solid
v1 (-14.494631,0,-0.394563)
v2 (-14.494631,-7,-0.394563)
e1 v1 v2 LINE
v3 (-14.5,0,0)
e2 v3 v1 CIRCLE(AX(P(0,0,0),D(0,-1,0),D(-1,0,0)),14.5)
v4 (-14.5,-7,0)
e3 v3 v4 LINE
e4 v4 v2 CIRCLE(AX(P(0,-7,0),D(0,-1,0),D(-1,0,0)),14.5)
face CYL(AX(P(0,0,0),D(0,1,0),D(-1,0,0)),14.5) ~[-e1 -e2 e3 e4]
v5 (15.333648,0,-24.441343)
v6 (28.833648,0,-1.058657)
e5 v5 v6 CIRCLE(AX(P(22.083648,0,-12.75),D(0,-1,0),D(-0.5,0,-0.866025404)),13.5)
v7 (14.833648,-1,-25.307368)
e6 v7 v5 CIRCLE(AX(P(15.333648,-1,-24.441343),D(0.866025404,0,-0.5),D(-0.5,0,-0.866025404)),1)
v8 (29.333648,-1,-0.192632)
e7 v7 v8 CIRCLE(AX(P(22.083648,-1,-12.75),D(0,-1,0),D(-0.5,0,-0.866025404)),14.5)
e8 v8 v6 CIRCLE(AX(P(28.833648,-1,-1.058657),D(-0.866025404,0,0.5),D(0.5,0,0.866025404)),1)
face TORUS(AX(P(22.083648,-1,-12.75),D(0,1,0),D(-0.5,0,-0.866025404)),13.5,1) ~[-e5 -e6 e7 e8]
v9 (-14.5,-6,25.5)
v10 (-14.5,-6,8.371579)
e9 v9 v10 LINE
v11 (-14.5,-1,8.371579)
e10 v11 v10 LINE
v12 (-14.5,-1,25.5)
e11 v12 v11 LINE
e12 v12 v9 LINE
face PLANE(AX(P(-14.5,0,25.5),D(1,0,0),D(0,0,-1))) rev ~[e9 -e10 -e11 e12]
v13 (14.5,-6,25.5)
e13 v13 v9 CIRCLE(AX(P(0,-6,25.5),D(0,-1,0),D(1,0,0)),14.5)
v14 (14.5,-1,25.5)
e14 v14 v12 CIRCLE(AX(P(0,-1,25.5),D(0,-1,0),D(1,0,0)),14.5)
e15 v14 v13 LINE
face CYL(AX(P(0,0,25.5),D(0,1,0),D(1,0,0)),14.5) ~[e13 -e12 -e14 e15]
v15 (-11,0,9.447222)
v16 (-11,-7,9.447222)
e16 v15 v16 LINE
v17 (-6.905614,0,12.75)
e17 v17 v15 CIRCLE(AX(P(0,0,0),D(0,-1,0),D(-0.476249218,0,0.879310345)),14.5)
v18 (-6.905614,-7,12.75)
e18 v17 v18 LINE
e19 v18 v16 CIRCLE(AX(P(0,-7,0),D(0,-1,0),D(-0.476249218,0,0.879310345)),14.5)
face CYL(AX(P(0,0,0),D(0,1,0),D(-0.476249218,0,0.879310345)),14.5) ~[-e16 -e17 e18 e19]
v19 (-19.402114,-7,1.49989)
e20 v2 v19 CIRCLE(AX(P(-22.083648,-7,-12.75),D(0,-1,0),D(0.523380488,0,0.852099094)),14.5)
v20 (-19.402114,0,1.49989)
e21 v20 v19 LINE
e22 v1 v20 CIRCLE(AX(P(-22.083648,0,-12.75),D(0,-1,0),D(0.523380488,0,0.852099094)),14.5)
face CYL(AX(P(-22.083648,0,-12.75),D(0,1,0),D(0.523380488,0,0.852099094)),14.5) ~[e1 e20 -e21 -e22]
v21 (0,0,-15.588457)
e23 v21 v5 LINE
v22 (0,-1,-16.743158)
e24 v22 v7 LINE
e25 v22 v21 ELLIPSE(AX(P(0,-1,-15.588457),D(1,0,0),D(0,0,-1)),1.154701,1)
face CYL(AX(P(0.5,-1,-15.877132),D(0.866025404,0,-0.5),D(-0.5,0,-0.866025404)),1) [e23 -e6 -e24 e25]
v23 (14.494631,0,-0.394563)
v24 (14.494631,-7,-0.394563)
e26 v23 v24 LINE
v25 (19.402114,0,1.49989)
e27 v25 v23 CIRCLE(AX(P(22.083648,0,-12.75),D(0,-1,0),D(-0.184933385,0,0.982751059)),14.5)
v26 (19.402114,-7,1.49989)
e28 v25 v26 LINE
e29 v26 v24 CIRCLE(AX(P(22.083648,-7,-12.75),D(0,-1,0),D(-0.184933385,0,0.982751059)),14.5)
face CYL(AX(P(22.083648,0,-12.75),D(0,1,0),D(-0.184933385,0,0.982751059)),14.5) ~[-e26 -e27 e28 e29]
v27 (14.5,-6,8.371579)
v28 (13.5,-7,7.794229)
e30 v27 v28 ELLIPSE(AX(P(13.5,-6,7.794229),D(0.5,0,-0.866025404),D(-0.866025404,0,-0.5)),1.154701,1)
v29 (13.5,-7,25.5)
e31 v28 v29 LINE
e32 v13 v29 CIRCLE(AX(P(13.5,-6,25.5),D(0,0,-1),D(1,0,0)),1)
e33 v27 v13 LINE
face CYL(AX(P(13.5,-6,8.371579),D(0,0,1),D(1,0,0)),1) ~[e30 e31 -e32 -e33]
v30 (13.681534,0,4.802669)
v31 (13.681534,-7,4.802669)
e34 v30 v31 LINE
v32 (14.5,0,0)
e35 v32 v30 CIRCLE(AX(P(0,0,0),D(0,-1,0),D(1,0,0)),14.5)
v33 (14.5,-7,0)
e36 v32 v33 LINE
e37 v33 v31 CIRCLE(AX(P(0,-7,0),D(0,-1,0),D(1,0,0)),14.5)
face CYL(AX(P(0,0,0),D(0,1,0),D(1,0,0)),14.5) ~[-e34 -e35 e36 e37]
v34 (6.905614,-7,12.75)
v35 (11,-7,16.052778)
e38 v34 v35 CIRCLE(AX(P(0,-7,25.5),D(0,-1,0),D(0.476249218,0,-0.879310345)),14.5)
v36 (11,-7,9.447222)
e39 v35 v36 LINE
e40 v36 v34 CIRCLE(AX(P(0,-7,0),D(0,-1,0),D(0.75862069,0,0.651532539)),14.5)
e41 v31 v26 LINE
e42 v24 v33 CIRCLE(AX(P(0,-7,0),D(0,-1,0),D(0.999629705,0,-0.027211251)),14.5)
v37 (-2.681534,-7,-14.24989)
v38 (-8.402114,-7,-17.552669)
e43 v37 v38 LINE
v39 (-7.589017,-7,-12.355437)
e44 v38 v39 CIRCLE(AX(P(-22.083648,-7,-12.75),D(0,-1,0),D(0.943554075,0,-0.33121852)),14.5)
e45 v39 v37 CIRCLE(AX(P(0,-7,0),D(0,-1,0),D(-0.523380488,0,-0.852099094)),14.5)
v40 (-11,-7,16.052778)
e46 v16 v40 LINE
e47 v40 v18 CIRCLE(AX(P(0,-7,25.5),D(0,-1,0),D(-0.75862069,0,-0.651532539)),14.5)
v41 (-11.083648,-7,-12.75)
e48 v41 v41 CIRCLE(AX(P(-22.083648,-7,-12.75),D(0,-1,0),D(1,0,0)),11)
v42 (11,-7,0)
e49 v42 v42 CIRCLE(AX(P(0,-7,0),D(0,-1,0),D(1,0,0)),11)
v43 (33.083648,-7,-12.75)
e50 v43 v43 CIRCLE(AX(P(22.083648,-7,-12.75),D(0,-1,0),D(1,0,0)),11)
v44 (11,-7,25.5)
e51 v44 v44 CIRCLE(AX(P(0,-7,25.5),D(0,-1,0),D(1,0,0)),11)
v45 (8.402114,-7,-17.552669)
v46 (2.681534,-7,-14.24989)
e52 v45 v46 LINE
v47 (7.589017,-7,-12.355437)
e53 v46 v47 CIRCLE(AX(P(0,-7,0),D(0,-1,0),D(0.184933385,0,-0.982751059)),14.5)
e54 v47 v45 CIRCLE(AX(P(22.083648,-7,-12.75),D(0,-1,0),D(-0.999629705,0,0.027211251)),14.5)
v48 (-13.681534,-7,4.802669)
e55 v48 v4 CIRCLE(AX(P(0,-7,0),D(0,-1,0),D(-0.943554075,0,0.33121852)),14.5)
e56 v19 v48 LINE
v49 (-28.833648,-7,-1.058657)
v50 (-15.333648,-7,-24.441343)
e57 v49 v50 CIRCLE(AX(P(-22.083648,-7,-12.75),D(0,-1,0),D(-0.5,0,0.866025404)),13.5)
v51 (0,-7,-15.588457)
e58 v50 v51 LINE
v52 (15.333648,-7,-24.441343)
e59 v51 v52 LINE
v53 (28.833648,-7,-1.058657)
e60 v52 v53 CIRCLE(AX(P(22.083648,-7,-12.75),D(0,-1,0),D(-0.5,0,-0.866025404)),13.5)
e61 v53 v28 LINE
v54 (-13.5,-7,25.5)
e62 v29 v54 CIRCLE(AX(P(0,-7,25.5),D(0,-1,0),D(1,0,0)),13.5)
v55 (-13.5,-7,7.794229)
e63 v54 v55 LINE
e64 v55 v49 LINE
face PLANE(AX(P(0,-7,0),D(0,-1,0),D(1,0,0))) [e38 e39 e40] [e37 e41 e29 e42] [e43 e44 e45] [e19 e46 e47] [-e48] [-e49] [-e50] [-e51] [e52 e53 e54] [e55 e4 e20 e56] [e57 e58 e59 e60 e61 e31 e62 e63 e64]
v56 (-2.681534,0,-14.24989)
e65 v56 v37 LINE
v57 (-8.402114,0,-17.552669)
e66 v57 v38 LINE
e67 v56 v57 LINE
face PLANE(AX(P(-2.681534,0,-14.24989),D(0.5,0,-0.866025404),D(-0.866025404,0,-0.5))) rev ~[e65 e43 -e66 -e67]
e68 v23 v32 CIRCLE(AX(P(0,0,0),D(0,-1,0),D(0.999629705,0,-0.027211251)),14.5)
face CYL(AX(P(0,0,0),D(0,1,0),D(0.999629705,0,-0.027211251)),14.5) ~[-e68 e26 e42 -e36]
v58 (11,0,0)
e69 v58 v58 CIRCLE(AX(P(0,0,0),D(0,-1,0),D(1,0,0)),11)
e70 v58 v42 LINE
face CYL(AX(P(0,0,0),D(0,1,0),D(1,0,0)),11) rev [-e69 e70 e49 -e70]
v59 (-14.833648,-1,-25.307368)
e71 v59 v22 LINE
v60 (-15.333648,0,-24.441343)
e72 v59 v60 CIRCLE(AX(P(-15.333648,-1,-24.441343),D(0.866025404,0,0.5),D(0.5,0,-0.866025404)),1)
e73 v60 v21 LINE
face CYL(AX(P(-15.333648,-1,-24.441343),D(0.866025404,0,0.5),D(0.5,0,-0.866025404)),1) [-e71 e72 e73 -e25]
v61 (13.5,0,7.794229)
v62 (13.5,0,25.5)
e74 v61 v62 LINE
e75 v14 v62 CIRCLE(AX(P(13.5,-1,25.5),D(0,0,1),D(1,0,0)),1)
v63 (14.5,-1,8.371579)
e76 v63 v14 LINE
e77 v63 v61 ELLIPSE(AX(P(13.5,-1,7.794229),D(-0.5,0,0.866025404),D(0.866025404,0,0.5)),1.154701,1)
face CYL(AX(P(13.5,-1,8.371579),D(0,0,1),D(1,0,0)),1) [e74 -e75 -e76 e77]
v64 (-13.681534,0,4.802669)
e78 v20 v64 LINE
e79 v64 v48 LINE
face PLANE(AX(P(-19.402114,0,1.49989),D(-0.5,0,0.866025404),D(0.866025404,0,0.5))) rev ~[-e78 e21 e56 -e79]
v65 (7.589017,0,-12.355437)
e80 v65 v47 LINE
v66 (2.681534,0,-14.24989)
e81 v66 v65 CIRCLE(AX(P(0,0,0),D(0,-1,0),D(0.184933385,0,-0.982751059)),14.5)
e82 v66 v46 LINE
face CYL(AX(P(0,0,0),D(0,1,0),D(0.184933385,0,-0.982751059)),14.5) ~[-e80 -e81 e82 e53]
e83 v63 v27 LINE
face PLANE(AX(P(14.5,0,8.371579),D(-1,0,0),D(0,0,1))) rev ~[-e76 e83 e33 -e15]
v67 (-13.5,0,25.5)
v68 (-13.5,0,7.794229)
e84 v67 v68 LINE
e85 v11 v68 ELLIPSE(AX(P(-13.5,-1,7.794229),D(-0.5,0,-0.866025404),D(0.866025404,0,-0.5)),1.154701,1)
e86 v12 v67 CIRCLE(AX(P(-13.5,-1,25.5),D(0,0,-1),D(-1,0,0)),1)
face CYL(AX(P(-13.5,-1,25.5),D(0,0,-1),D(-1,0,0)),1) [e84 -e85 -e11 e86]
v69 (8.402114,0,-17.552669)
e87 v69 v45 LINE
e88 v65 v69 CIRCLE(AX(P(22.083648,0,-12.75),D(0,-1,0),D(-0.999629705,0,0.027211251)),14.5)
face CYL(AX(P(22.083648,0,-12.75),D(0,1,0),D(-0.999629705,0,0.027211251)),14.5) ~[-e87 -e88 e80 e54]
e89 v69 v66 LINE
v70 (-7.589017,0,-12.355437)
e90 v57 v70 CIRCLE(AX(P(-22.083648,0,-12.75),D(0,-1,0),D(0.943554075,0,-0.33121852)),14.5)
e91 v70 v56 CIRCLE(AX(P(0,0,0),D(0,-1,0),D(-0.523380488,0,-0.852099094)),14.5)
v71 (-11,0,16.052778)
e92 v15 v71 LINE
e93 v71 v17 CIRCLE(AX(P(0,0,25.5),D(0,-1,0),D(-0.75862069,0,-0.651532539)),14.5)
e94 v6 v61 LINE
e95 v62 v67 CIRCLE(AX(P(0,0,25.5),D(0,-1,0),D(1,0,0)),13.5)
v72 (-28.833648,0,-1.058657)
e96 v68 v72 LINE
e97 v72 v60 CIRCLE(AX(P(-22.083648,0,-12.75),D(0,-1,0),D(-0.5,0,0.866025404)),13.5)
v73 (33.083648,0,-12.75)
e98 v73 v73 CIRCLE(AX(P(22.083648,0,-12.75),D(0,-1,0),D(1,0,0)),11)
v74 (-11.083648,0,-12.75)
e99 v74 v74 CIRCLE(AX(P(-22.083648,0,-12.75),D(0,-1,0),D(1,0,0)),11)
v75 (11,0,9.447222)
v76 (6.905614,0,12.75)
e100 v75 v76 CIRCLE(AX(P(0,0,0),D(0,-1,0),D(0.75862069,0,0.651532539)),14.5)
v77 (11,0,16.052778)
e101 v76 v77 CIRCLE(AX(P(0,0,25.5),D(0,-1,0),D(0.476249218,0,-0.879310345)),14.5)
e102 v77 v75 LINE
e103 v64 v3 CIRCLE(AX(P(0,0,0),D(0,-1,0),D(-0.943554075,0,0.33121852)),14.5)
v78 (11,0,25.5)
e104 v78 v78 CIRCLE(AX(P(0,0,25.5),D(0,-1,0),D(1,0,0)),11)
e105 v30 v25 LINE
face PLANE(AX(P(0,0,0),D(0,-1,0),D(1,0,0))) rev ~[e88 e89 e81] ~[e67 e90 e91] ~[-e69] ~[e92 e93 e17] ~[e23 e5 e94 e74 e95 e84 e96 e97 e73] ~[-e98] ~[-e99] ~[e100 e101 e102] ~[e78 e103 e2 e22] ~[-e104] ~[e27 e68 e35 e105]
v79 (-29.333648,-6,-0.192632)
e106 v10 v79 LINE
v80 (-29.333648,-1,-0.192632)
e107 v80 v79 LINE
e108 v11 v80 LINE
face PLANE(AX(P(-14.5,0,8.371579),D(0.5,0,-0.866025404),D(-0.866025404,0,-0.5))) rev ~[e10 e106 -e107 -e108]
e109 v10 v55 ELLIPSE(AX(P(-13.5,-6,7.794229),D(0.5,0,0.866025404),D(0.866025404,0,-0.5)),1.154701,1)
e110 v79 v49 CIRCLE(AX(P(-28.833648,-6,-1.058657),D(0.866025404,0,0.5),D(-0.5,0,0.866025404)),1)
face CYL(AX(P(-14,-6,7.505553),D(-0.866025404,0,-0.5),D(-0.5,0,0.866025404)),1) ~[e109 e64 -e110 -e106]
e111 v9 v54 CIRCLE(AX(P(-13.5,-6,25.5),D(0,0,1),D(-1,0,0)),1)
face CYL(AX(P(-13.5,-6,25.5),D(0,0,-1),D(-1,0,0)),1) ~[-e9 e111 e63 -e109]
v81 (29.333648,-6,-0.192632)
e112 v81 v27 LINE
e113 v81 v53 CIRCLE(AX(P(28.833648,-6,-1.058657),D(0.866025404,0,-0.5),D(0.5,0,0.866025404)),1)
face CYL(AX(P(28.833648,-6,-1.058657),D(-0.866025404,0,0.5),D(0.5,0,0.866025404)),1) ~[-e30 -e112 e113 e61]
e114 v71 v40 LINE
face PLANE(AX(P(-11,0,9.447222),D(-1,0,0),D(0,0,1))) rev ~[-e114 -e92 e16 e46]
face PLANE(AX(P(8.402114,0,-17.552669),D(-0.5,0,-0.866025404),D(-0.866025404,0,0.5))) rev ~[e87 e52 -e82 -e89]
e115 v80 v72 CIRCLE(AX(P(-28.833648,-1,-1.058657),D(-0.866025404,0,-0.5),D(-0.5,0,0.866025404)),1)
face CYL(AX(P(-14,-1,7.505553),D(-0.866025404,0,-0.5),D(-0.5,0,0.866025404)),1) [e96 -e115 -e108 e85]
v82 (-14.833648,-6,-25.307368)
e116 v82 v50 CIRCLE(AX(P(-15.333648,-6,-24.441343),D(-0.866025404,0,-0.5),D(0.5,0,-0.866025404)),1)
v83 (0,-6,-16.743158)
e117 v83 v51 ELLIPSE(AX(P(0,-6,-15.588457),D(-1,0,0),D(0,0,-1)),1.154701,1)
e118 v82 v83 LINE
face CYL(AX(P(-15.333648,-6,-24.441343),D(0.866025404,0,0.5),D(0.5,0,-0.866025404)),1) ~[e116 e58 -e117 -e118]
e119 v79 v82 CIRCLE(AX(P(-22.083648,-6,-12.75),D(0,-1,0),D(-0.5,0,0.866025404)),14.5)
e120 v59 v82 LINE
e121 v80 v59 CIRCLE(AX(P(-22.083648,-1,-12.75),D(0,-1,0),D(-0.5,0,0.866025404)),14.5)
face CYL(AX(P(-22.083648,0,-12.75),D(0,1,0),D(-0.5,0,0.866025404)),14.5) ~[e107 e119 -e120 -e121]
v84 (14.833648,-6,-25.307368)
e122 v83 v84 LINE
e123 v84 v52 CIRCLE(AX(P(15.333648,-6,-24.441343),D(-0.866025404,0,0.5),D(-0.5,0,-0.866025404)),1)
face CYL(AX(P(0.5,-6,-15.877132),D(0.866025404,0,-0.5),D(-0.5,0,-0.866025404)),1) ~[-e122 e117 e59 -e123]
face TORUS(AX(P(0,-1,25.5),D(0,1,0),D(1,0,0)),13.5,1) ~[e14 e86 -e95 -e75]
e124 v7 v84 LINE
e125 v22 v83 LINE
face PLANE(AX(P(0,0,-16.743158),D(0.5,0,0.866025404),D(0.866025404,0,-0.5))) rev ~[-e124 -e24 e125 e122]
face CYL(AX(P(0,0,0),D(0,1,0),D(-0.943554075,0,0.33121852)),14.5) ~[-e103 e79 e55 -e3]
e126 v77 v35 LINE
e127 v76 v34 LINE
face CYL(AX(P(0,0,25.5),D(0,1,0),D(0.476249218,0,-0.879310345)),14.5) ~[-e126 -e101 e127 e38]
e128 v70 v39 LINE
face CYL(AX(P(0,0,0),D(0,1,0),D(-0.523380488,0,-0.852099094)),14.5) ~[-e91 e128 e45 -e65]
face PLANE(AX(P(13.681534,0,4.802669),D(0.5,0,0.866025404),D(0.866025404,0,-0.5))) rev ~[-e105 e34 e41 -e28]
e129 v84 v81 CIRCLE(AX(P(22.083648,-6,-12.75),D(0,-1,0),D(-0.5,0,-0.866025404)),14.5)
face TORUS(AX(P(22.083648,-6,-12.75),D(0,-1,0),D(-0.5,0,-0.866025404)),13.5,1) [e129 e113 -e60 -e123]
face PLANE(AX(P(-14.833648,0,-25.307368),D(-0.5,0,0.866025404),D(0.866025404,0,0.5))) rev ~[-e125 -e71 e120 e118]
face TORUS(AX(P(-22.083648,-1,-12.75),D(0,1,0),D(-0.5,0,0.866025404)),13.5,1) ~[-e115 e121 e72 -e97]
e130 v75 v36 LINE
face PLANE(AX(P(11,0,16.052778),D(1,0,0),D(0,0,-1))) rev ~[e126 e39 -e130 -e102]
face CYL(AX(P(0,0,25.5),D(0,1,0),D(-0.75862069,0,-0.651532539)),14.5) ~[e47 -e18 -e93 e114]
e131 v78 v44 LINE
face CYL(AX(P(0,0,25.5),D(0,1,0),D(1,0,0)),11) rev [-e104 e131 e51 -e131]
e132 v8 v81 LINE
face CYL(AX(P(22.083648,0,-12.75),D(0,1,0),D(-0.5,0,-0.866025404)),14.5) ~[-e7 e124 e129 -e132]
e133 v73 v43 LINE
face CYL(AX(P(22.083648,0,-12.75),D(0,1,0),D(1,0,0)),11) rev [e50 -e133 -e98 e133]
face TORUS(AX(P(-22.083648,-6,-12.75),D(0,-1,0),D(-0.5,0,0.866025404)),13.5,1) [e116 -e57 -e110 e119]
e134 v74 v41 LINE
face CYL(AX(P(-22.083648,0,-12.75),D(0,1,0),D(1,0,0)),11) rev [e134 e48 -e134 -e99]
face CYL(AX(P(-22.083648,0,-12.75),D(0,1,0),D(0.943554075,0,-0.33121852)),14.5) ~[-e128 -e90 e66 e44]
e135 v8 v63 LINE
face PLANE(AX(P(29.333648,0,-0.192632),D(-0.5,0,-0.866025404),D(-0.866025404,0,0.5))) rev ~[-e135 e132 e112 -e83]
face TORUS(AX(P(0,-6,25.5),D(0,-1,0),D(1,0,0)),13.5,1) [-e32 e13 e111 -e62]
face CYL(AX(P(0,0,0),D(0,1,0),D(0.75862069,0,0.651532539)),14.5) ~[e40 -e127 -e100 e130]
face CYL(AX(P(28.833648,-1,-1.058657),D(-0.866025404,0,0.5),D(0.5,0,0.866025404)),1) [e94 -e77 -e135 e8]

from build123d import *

# Parameters (mm, degrees)
F0_R     = 11
F1_DEPTH = 7
F2_R     = 1


# Not quite as in the source:
# - a feature names something its author has since deleted; it is built from what else it names


with BuildPart() as f1:
    # F0 (on Front) → F1 (new body)
    with BuildSketch(Plane.XZ):
        with BuildLine():
            ThreePointArc((14.5, 25.5), (0, 40), (-14.5, 25.5))
            Line((-14.5, 25.5), (-14.5, 8.3715789032))
            Line((-14.5, 8.3715789032), (-29.3336477965, -0.1926316451))
            ThreePointArc((-29.3336477965, -0.1926316451), (-34.6410161514, -20), (-14.8336477965, -25.3073683549))
            Line((-14.8336477965, -25.3073683549), (0, -16.7431578065))
            Line((0, -16.7431578065), (14.8336477965, -25.3073683549))
            ThreePointArc((14.8336477965, -25.3073683549), (34.6410161514, -20), (29.3336477965, -0.1926316451))
            Line((29.3336477965, -0.1926316451), (14.5, 8.3715789032))
            Line((14.5, 8.3715789032), (14.5, 25.5))
        make_face()
        with Locations((-22.0836477965, -12.75)):
            Circle(F0_R, mode=Mode.SUBTRACT)
        with BuildLine():
            ThreePointArc((-8.4021137105, -17.5526685347), (-7.7579062737, -14.9912339956), (-7.589017069, -12.355436857))
            ThreePointArc((-7.589017069, -12.355436857), (-5.2219051854, -13.5270730846), (-2.681534086, -14.2498903486))
            Line((-2.681534086, -14.2498903486), (-8.4021137105, -17.5526685347))
        make_face(mode=Mode.SUBTRACT)
        with BuildLine():
            ThreePointArc((-13.681534086, 4.8026685347), (-14.293919061, 2.4359552288), (-14.5, 0))
            ThreePointArc((-14.5, 0), (-14.4986576197, -0.1972998371), (-14.4946307275, -0.394563143))
            ThreePointArc((-14.4946307275, -0.394563143), (-16.8617426112, 0.7770730846), (-19.4021137105, 1.4998903486))
            Line((-19.4021137105, 1.4998903486), (-13.681534086, 4.8026685347))
        make_face(mode=Mode.SUBTRACT)
        with BuildLine():
            Line((8.4021137105, -17.5526685347), (2.681534086, -14.2498903486))
            ThreePointArc((2.681534086, -14.2498903486), (5.2219051854, -13.5270730846), (7.589017069, -12.355436857))
            ThreePointArc((7.589017069, -12.355436857), (7.7579062737, -14.9912339956), (8.4021137105, -17.5526685347))
        make_face(mode=Mode.SUBTRACT)
        with Locations((22.0836477965, -12.75)):
            Circle(F0_R, mode=Mode.SUBTRACT)
        Circle(F0_R, mode=Mode.SUBTRACT)
        with BuildLine():
            ThreePointArc((19.4021137105, 1.4998903486), (16.8617426112, 0.7770730846), (14.4946307275, -0.394563143))
            ThreePointArc((14.4946307275, -0.394563143), (14.4986576197, -0.1972998371), (14.5, 0))
            ThreePointArc((14.5, 0), (14.293919061, 2.4359552288), (13.681534086, 4.8026685347))
            Line((13.681534086, 4.8026685347), (19.4021137105, 1.4998903486))
        make_face(mode=Mode.SUBTRACT)
        with BuildLine():
            Line((-11, 9.4472218138), (-11, 16.0527781862))
            ThreePointArc((-11, 16.0527781862), (-9.1038363374, 14.214160911), (-6.9056136585, 12.75))
            ThreePointArc((-6.9056136585, 12.75), (-9.1038363374, 11.285839089), (-11, 9.4472218138))
        make_face(mode=Mode.SUBTRACT)
        with BuildLine():
            ThreePointArc((6.9056136585, 12.75), (9.1038363374, 14.214160911), (11, 16.0527781862))
            Line((11, 16.0527781862), (11, 9.4472218138))
            ThreePointArc((11, 9.4472218138), (9.1038363374, 11.285839089), (6.9056136585, 12.75))
        make_face(mode=Mode.SUBTRACT)
        with Locations((0, 25.5)):
            Circle(F0_R, mode=Mode.SUBTRACT)
    extrude(amount=F1_DEPTH)

    # F2
    f2_edges = [f1.edges().sort_by_distance(p)[0] for p in [
        (21.916824, -7, 4.089474),
        (14.5, -7, 16.935789),
        (14.5, 0, 16.935789),
        (21.916824, 0, 4.089474),
        (-7.416824, -7, -21.025263),
        (-21.916824, 0, 4.089474),
    ]]
    fillet(f2_edges, radius=F2_R)


solid = f1.part
